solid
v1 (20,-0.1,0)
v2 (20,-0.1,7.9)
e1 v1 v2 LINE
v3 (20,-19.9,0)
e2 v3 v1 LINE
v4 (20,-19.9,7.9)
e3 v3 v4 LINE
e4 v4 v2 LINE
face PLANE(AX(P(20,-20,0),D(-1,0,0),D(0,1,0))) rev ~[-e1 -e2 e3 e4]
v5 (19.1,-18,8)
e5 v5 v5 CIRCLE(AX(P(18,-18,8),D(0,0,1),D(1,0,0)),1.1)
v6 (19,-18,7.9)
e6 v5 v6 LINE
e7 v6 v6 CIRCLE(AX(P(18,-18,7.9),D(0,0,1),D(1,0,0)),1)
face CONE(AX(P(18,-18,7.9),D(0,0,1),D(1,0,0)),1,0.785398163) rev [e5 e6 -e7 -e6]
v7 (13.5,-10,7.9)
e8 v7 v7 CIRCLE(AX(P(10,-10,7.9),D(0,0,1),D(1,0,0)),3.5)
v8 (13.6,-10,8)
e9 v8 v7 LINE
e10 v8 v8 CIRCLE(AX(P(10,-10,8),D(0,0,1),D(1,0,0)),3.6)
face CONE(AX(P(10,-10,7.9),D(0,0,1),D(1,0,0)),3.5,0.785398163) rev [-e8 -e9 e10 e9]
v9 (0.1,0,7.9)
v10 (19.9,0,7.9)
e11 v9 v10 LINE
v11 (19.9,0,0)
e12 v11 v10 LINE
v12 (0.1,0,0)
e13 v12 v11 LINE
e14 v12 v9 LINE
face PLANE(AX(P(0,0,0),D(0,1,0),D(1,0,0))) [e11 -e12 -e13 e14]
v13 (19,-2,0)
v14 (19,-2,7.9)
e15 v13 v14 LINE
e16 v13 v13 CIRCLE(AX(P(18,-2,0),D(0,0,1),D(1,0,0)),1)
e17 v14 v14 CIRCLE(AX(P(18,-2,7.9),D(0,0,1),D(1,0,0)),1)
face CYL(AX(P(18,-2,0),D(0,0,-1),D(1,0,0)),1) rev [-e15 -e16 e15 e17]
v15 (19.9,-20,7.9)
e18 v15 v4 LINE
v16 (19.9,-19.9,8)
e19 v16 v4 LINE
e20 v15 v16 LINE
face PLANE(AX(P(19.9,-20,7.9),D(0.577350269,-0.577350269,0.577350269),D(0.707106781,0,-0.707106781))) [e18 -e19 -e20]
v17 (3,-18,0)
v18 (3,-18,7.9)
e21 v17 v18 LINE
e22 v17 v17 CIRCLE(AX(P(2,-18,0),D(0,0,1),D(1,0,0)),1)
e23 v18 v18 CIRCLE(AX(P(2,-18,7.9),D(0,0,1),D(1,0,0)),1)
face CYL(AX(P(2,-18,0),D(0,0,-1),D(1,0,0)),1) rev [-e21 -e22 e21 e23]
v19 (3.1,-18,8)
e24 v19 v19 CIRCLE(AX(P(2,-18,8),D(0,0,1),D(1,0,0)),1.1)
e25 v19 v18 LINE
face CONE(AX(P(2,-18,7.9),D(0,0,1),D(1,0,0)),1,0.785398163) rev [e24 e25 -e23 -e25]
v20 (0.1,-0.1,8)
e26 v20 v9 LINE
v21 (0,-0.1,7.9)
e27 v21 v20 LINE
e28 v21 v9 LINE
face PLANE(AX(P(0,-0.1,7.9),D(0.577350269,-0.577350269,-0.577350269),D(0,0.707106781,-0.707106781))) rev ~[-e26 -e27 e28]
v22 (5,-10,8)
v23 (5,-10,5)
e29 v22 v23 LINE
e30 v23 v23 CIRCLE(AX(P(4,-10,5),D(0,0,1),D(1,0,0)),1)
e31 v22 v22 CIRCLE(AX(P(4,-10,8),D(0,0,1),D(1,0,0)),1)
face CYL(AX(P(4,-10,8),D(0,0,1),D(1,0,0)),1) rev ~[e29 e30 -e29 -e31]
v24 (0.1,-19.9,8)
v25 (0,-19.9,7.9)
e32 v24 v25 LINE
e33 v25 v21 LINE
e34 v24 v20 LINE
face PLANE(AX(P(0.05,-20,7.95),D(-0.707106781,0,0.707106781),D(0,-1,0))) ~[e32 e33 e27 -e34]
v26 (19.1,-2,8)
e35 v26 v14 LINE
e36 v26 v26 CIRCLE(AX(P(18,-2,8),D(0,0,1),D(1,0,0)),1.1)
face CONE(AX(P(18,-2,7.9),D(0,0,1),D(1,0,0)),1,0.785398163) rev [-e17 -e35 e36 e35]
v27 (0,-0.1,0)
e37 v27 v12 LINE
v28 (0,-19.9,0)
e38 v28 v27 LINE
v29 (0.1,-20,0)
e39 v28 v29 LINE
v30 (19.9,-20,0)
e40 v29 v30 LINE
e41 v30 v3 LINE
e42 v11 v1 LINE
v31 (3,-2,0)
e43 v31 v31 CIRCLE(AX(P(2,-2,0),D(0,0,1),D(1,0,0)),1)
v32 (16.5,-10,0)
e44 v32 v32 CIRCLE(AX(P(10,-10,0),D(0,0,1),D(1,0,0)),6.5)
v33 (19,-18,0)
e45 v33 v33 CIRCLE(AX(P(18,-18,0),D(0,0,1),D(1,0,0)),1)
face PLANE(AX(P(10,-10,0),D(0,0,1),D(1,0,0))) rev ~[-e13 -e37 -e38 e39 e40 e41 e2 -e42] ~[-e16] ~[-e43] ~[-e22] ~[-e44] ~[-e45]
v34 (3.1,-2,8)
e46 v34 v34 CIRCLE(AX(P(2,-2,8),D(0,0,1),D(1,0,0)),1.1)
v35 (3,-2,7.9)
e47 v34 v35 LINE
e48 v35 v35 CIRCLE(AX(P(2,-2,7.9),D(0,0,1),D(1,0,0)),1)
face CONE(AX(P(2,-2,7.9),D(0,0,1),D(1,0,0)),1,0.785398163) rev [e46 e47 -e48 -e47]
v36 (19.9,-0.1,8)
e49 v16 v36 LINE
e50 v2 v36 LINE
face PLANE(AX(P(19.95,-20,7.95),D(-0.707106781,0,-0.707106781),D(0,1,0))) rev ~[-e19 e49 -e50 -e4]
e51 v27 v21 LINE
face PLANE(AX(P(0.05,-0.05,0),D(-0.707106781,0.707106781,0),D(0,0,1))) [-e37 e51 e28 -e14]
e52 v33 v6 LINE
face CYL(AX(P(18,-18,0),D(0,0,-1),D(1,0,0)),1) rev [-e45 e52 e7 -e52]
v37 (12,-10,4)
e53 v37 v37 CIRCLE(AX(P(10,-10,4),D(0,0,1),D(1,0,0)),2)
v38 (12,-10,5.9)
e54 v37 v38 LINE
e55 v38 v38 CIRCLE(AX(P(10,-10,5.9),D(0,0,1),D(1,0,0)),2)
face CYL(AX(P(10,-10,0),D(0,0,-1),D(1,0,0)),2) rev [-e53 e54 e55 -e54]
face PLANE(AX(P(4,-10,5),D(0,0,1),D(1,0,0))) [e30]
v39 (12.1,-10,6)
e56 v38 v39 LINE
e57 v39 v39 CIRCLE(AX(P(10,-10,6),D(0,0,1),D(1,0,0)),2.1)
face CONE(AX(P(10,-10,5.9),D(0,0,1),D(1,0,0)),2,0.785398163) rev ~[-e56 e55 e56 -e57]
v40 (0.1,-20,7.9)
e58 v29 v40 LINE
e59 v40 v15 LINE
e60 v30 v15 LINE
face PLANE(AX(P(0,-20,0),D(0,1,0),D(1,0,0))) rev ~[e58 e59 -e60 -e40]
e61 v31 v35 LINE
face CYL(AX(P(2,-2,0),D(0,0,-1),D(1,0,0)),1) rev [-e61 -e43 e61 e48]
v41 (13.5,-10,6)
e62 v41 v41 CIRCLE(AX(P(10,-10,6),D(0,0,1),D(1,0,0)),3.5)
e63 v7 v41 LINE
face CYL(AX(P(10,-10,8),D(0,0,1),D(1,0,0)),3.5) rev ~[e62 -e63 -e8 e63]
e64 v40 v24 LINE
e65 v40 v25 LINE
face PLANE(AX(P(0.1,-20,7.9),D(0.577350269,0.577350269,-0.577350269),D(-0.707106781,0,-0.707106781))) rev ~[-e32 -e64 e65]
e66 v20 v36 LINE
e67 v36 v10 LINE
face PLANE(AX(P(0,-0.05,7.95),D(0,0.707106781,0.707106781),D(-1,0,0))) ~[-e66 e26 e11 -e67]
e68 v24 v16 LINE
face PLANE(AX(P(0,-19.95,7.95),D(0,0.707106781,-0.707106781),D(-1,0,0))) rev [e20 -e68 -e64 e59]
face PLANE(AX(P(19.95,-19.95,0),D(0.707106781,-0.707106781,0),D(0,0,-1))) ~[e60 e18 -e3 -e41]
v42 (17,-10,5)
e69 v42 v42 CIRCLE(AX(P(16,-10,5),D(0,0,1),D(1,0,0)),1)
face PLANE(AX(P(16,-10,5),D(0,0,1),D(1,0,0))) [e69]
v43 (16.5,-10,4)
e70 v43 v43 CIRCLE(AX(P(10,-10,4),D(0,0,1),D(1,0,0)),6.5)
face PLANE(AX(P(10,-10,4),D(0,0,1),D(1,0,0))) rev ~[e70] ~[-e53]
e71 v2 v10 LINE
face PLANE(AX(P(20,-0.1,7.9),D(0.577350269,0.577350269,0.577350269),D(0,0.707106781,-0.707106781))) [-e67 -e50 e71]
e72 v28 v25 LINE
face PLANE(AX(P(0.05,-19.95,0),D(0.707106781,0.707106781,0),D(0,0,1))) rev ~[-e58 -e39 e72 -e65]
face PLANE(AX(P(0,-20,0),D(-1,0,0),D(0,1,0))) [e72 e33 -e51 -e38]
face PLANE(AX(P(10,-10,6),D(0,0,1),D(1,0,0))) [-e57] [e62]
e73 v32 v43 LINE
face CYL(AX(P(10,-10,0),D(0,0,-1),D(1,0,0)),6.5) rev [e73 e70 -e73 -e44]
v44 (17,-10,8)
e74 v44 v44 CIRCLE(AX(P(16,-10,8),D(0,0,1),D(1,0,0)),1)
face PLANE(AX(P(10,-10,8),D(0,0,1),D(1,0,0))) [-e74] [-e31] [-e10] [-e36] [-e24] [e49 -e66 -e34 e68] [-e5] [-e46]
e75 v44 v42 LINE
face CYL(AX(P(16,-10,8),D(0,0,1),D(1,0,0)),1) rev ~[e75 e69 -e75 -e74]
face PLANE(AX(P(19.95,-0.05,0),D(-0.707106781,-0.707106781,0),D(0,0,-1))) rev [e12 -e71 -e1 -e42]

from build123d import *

# Parameters (mm, degrees)
F0_W     = 20
F0_H     = 20
F0_R     = 1
F0_R_2   = 8.5
F0_R_3   = 7
F0_R_4   = 6.5
F0_R_5   = 1.25
F0_R_6   = 2
F1_DEPTH = 8
F2_R     = 3.5
F2_R_2   = 2
F3_DEPTH = 2
F4_SIZE  = 0.1
F5_DEPTH = 4
F6_R     = 1
F7_DEPTH = 3


with BuildPart() as f1:
    # F0 (on Top) → F1 (new body)
    with BuildSketch(Plane.XY):
        with Locations((10, -10)):
            Rectangle(F0_W, F0_H)
        with Locations((2, -18)):
            Circle(F0_R, mode=Mode.SUBTRACT)
        with Locations((18, -18)):
            Circle(F0_R, mode=Mode.SUBTRACT)
        with Locations((2, -2)):
            Circle(F0_R, mode=Mode.SUBTRACT)
        with Locations((10, -10)):
            Circle(F0_R_2, mode=Mode.SUBTRACT)
        with Locations((18, -2)):
            Circle(F0_R, mode=Mode.SUBTRACT)
        with Locations((10, -10)):
            Circle(F0_R_2)
        with Locations((10, -10)):
            Circle(F0_R_3, mode=Mode.SUBTRACT)
        with Locations((10, -10)):
            Circle(F0_R_3)
        with Locations((10, -10)):
            Circle(F0_R_4, mode=Mode.SUBTRACT)
        with Locations((10, -10)):
            Circle(F0_R_4)
        with BuildLine():
            ThreePointArc((11.25, -14.25), (9.1161165153, -15.1338834682), (10.0000000233, -13))
            ThreePointArc((10.0000000233, -13), (10.8838834847, -13.3661165318), (11.25, -14.25))
        make_face(mode=Mode.SUBTRACT)
        with Locations((5.75, -10)):
            Circle(F0_R_5, mode=Mode.SUBTRACT)
        with BuildLine():
            ThreePointArc((10, -7), (12.1213203436, -7.8786796564), (13, -10))
            ThreePointArc((13, -10), (12.1213203518, -12.1213203353), (10.0000000233, -13))
            ThreePointArc((10.0000000233, -13), (7.8786796647, -12.1213203518), (7, -10))
            ThreePointArc((7, -10), (7.8786796564, -7.8786796564), (10, -7))
        make_face(mode=Mode.SUBTRACT)
        with BuildLine():
            ThreePointArc((15.5, -10), (14.25, -11.25), (13, -10))
            ThreePointArc((13, -10), (14.25, -8.75), (15.5, -10))
        make_face(mode=Mode.SUBTRACT)
        with BuildLine():
            ThreePointArc((11.25, -5.75), (10.8838834765, -6.6338834765), (10, -7))
            ThreePointArc((10, -7), (9.1161165235, -4.8661165235), (11.25, -5.75))
        make_face(mode=Mode.SUBTRACT)
        with BuildLine():
            ThreePointArc((10.0000000233, -13), (12.1213203518, -12.1213203353), (13, -10))
            ThreePointArc((13, -10), (12.1213203436, -7.8786796564), (10, -7))
            ThreePointArc((10, -7), (7.8786796564, -7.8786796564), (7, -10))
            ThreePointArc((7, -10), (7.8786796647, -12.1213203518), (10.0000000233, -13))
        make_face()
        with Locations((10, -10)):
            Circle(F0_R_6, mode=Mode.SUBTRACT)
        with BuildLine():
            ThreePointArc((15.5, -10), (14.25, -8.75), (13, -10))
            ThreePointArc((13, -10), (14.25, -11.25), (15.5, -10))
        make_face()
        with BuildLine():
            ThreePointArc((11.25, -5.75), (9.1161165235, -4.8661165235), (10, -7))
            ThreePointArc((10, -7), (10.8838834765, -6.6338834765), (11.25, -5.75))
        make_face()
        with Locations((5.75, -10)):
            Circle(F0_R_5)
        with BuildLine():
            ThreePointArc((11.25, -14.25), (10.8838834847, -13.3661165318), (10.0000000233, -13))
            ThreePointArc((10.0000000233, -13), (9.1161165153, -15.1338834682), (11.25, -14.25))
        make_face()
    extrude(amount=F1_DEPTH)

    # F2 (on face) → F3 (cut)
    with BuildSketch(Plane.XY.offset(8)):
        with Locations((10, -10)):
            Circle(F2_R)
        with Locations((10, -10)):
            Circle(F2_R_2, mode=Mode.SUBTRACT)
    extrude(amount=-F3_DEPTH, mode=Mode.SUBTRACT)

    # F4
    f4_edges = [f1.edges().sort_by_distance(p)[0] for p in [
        (10, 0, 8),
        (20, -10, 8),
        (0, -10, 8),
        (10, -20, 8),
        (1, -18, 8),
        (17, -18, 8),
        (1, -2, 8),
        (6.5, -10, 8),
        (17, -2, 8),
        (20, -20, 4),
        (20, 0, 4),
        (0, -20, 4),
        (0, 0, 4),
        (8, -10, 6),
    ]]
    chamfer(f4_edges, length=F4_SIZE)

    # F0 (on Top) → F5 (cut)
    with BuildSketch(Plane.XY):
        with Locations((10, -10)):
            Circle(F0_R_4)
        with BuildLine():
            ThreePointArc((11.25, -14.25), (9.1161165153, -15.1338834682), (10.0000000233, -13))
            ThreePointArc((10.0000000233, -13), (10.8838834847, -13.3661165318), (11.25, -14.25))
        make_face(mode=Mode.SUBTRACT)
        with Locations((5.75, -10)):
            Circle(F0_R_5, mode=Mode.SUBTRACT)
        with BuildLine():
            ThreePointArc((10, -7), (12.1213203436, -7.8786796564), (13, -10))
            ThreePointArc((13, -10), (12.1213203518, -12.1213203353), (10.0000000233, -13))
            ThreePointArc((10.0000000233, -13), (7.8786796647, -12.1213203518), (7, -10))
            ThreePointArc((7, -10), (7.8786796564, -7.8786796564), (10, -7))
        make_face(mode=Mode.SUBTRACT)
        with BuildLine():
            ThreePointArc((15.5, -10), (14.25, -11.25), (13, -10))
            ThreePointArc((13, -10), (14.25, -8.75), (15.5, -10))
        make_face(mode=Mode.SUBTRACT)
        with BuildLine():
            ThreePointArc((11.25, -5.75), (10.8838834765, -6.6338834765), (10, -7))
            ThreePointArc((10, -7), (9.1161165235, -4.8661165235), (11.25, -5.75))
        make_face(mode=Mode.SUBTRACT)
        with BuildLine():
            ThreePointArc((10.0000000233, -13), (12.1213203518, -12.1213203353), (13, -10))
            ThreePointArc((13, -10), (12.1213203436, -7.8786796564), (10, -7))
            ThreePointArc((10, -7), (7.8786796564, -7.8786796564), (7, -10))
            ThreePointArc((7, -10), (7.8786796647, -12.1213203518), (10.0000000233, -13))
        make_face()
        with Locations((10, -10)):
            Circle(F0_R_6, mode=Mode.SUBTRACT)
        with BuildLine():
            ThreePointArc((15.5, -10), (14.25, -8.75), (13, -10))
            ThreePointArc((13, -10), (14.25, -11.25), (15.5, -10))
        make_face()
        with BuildLine():
            ThreePointArc((11.25, -14.25), (10.8838834847, -13.3661165318), (10.0000000233, -13))
            ThreePointArc((10.0000000233, -13), (9.1161165153, -15.1338834682), (11.25, -14.25))
        make_face()
        with Locations((5.75, -10)):
            Circle(F0_R_5)
        with BuildLine():
            ThreePointArc((11.25, -5.75), (9.1161165235, -4.8661165235), (10, -7))
            ThreePointArc((10, -7), (10.8838834765, -6.6338834765), (11.25, -5.75))
        make_face()
    extrude(amount=F5_DEPTH, mode=Mode.SUBTRACT)

    # F6 (on face) → F7 (cut)
    with BuildSketch(Plane.XY.offset(8)):
        with Locations((4, -10)):
            Circle(F6_R)
        with Locations((16, -10)):
            Circle(F6_R)
    extrude(amount=-F7_DEPTH, mode=Mode.SUBTRACT)


solid = f1.part
